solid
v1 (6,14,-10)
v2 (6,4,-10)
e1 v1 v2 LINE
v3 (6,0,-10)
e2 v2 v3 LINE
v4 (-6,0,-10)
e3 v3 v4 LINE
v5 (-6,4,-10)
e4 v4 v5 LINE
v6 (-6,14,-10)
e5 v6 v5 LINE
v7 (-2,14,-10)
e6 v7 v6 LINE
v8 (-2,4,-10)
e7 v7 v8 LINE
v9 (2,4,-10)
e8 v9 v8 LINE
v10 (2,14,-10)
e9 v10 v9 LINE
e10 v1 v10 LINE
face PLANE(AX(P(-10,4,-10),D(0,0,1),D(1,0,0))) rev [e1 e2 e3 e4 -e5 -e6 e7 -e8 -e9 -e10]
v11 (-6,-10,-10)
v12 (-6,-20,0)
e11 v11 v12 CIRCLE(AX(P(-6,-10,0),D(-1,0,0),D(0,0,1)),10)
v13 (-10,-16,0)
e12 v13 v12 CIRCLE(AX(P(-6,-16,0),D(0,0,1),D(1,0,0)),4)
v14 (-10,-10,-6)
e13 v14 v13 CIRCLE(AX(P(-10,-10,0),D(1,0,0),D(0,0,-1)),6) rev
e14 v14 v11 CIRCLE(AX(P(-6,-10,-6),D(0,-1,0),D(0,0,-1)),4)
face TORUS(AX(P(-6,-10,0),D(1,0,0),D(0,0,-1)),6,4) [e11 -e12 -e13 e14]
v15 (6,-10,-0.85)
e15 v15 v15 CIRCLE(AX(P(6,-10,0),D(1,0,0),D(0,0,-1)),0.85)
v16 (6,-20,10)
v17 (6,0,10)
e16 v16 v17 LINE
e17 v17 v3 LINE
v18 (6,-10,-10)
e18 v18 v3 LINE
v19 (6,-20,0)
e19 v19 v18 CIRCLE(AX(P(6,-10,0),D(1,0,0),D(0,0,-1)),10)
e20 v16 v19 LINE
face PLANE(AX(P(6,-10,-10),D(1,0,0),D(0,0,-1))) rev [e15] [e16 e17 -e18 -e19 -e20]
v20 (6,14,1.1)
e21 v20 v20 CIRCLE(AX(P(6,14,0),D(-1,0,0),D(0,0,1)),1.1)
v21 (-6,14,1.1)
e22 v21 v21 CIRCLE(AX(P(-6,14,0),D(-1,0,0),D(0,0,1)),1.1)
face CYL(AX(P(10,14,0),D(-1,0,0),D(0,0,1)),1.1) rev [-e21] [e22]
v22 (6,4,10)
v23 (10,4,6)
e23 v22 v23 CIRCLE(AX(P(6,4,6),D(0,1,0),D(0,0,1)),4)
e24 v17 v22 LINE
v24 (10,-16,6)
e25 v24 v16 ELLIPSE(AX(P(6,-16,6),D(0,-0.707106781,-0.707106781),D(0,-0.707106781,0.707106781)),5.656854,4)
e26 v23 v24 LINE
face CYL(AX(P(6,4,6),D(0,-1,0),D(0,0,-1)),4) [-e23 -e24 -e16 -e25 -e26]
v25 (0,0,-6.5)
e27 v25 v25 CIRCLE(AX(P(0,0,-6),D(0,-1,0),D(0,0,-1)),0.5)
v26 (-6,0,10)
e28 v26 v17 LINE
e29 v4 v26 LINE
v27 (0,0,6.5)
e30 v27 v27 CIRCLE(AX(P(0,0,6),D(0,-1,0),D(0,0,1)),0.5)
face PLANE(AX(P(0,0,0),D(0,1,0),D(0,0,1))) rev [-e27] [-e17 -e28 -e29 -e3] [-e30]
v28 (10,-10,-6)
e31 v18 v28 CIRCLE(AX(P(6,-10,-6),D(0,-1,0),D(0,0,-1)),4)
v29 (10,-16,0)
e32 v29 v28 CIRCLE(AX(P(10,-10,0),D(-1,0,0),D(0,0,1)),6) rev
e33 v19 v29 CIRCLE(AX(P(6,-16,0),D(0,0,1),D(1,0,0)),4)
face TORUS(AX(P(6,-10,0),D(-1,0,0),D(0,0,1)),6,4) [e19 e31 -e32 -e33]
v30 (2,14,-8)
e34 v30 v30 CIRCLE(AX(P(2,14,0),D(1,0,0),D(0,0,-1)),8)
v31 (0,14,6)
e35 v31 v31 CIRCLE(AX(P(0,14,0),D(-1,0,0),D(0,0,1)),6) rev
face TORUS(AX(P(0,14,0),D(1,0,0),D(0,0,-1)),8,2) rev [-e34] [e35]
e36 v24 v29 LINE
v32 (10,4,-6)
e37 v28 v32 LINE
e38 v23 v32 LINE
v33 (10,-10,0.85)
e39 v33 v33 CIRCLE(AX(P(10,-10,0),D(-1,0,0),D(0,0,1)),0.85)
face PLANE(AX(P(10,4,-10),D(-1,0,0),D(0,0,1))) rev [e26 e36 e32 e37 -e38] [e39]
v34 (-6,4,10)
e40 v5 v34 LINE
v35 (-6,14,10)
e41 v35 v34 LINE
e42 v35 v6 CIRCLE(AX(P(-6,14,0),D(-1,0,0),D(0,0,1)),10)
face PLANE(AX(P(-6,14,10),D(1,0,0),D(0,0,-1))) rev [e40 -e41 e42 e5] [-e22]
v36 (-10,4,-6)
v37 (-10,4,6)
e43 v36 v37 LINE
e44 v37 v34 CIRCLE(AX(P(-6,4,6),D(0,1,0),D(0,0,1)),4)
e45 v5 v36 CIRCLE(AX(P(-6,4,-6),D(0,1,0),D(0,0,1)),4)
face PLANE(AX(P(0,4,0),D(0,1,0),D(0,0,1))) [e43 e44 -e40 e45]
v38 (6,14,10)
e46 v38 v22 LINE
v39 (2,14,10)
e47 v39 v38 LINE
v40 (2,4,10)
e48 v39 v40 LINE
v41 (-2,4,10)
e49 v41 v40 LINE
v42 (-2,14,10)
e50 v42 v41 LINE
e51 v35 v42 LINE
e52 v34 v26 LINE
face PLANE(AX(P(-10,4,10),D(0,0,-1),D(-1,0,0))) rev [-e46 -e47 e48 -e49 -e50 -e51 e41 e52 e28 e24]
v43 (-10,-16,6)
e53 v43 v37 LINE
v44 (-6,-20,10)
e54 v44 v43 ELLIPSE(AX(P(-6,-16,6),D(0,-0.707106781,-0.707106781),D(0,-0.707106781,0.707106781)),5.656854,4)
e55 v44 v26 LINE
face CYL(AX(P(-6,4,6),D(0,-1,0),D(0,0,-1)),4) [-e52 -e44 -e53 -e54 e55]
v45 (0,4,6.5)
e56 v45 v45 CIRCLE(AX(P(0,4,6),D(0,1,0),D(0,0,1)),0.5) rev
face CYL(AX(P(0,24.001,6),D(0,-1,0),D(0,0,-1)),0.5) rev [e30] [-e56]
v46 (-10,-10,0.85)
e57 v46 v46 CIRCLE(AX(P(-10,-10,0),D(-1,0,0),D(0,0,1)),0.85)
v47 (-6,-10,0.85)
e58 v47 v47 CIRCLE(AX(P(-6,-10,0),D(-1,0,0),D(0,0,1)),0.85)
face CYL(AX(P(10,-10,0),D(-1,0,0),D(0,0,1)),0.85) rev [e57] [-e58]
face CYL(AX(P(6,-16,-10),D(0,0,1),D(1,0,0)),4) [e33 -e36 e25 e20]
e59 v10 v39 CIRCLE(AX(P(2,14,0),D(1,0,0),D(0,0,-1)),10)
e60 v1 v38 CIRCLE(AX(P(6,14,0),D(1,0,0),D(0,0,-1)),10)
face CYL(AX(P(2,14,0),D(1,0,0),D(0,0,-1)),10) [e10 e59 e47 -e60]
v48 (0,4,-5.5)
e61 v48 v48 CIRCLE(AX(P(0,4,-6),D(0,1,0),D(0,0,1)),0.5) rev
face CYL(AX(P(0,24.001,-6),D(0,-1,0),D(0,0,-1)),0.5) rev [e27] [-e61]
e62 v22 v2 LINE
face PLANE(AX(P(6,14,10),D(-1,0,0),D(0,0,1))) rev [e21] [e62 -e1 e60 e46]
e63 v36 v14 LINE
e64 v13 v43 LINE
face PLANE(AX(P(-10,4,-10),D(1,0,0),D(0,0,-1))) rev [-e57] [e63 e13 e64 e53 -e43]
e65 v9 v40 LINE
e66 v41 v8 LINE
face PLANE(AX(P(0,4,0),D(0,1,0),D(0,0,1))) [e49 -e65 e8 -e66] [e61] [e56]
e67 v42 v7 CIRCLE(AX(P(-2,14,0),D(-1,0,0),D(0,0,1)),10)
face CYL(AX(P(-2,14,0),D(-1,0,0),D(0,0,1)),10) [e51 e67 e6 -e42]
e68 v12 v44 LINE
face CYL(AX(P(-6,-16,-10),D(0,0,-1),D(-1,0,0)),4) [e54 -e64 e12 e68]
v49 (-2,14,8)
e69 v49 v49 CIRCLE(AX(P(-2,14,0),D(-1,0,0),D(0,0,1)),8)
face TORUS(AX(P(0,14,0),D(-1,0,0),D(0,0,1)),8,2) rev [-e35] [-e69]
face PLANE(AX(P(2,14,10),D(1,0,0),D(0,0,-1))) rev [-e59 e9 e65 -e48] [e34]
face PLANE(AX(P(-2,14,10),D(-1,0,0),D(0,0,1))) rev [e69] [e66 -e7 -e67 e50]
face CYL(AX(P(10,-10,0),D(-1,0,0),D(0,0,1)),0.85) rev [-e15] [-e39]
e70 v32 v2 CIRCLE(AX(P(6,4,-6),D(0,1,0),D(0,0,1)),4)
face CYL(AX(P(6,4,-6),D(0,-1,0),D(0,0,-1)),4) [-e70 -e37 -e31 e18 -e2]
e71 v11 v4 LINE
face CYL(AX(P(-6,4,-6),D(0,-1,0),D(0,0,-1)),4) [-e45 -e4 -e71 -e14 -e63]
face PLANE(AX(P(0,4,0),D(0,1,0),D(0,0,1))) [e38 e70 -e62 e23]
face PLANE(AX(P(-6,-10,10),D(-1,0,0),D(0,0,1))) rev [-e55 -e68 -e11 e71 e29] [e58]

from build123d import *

# Parameters (mm, degrees)
SKETCH1_W           = 20
SKETCH1_H           = 20
BOSS_EXTRUDE1_DEPTH = 4
SKETCH4_W           = 4
SKETCH4_H           = 20
BOSS_EXTRUDE2_DEPTH = 10
BOSS_EXTRUDE3_DEPTH = 4
BOSS_EXTRUDE4_START = -4
BOSS_EXTRUDE4_DEPTH = 4
SKETCH7_R           = 0.85
CUT_EXTRUDE1_DEPTH  = 31
FILLET1_R           = 4
SKETCH8_W           = 4
SKETCH8_H           = 20
BOSS_EXTRUDE5_DEPTH = 10
SKETCH9_R           = 10
BOSS_EXTRUDE6_DEPTH = 4
BOSS_EXTRUDE7_START = -4
SKETCH10_R          = 10
BOSS_EXTRUDE7_DEPTH = 4
SKETCH12_R          = 1.1
CUT_EXTRUDE2_DEPTH  = 31.528675045
SKETCH13_R          = 6
BOSS_EXTRUDE8_DEPTH = 4
SKETCH14_R          = 1.1
CUT_EXTRUDE3_DEPTH  = 4
FILLET2_R           = 2
CUT_EXTRUDE4_REACH  = 29.857
SKETCH16_R          = 0.5


with BuildPart() as part:
    # Sketch1 → Boss-Extrude1 (new body)
    with BuildSketch(Plane(origin=(0, 0, 0), x_dir=(1, 0, 0), z_dir=(0, 1, 0))):
        Rectangle(SKETCH1_W, SKETCH1_H)
    extrude(amount=BOSS_EXTRUDE1_DEPTH)

    # Sketch4 → Boss-Extrude2 (add)
    with BuildSketch(Plane.XZ):
        with Locations((-8, 0)):
            Rectangle(SKETCH4_W, SKETCH4_H)
        with Locations((8, 0)):
            Rectangle(SKETCH4_W, SKETCH4_H)
    extrude(amount=BOSS_EXTRUDE2_DEPTH)

    # Sketch5 → Boss-Extrude3 (add)
    with BuildSketch(Plane.ZY.offset(10)):
        with BuildLine():
            Line((0, -20), (10, -20))
            Line((10, -20), (10, -10))
            ThreePointArc((10, -10), (-7.071067812, -2.928932188), (0, -20))
        make_face()
    extrude(amount=-BOSS_EXTRUDE3_DEPTH)

    # Sketch6 → Boss-Extrude4 (add)
    with BuildSketch(Plane(origin=(10, 0, 0), x_dir=(0, 0, -1), z_dir=(1, 0, 0)).offset(BOSS_EXTRUDE4_START)):
        with BuildLine():
            Line((0, -20), (-10, -20))
            Line((-10, -20), (-10, -10))
            ThreePointArc((-10, -10), (7.071067812, -2.928932188), (0, -20))
        make_face()
    extrude(amount=BOSS_EXTRUDE4_DEPTH)

    # Sketch7 → Cut-Extrude1 (cut, through all)
    with BuildSketch(Plane.ZY.offset(10)):
        with Locations((0, -10)):
            Circle(SKETCH7_R)
    extrude(amount=-CUT_EXTRUDE1_DEPTH, mode=Mode.SUBTRACT)

    # Fillet1
    fillet1_edges = [part.edges().sort_by_distance(p)[0] for p in [
        (-10, -8, 10),
        (-10, -17.071067812, -7.071067812),
        (10, -8, 10),
        (10, -17.071067812, -7.071067812),
        (-10, -3, -10),
        (10, -3, -10),
        (10, -20, 5),
        (-10, -20, 5),
    ]]
    fillet(fillet1_edges, radius=FILLET1_R - 0.0001)  # a hair under: the kernel refuses the full size

    # Sketch8 → Boss-Extrude5 (add)
    with BuildSketch(Plane(origin=(0, 4, 0), x_dir=(1, 0, 0), z_dir=(0, 1, 0))):
        with Locations((4, 0)):
            Rectangle(SKETCH8_W, SKETCH8_H)
        with Locations((-4, 0)):
            Rectangle(SKETCH8_W, SKETCH8_H)
    extrude(amount=BOSS_EXTRUDE5_DEPTH)

    # Sketch9 → Boss-Extrude6 (add)
    with BuildSketch(Plane(origin=(6, 0, 0), x_dir=(0, 0, -1), z_dir=(1, 0, 0))):
        with Locations((0, 14)):
            Circle(SKETCH9_R)
    extrude(amount=-BOSS_EXTRUDE6_DEPTH)

    # Sketch10 → Boss-Extrude7 (add)
    with BuildSketch(Plane.ZY.offset(6).offset(BOSS_EXTRUDE7_START)):
        with Locations((0, 14)):
            Circle(SKETCH10_R)
    extrude(amount=BOSS_EXTRUDE7_DEPTH)

    # Sketch12 → Cut-Extrude2 (cut, through all)
    with BuildSketch(Plane.ZY.offset(6)):
        with Locations((0, 14)):
            Circle(SKETCH12_R)
    extrude(amount=-CUT_EXTRUDE2_DEPTH, mode=Mode.SUBTRACT)

    # Sketch13 → Boss-Extrude8 (add)
    with BuildSketch(Plane(origin=(-2, 0, 0), x_dir=(0, 0, -1), z_dir=(1, 0, 0))):
        with Locations(Location((0, 14, 0), (0, 0, 180))):
            Circle(SKETCH13_R)
    extrude(amount=BOSS_EXTRUDE8_DEPTH)

    # Sketch14 → Cut-Extrude3 (cut)
    with BuildSketch(Plane(origin=(-2, 0, 0), x_dir=(0, 0, -1), z_dir=(1, 0, 0))):
        with Locations(Location((0, 14, 0), (0, 0, 180))):
            Circle(SKETCH14_R)
    extrude(amount=CUT_EXTRUDE3_DEPTH, mode=Mode.SUBTRACT)

    # Fillet2
    fillet2_edges = [part.edges().sort_by_distance(p)[0] for p in [
        (-2, 14, -6),
        (2, 14, -6),
    ]]
    fillet(fillet2_edges, radius=FILLET2_R - 0.0001)  # a hair under: the kernel refuses the full size

    # Sketch16 → Cut-Extrude4 (cut, up to next)
    with BuildSketch(Plane.XZ, mode=Mode.PRIVATE) as cut_extrude4_sk1:
        with Locations(Location((0, -6, 0), (0, 0, 270))):
            Circle(SKETCH16_R)
    cut_extrude4_tool1 = extrude(cut_extrude4_sk1.sketch, amount=-CUT_EXTRUDE4_REACH, mode=Mode.PRIVATE) & part.part
    # Sketch16 → Cut-Extrude4 (cut, up to next)
    with BuildSketch(Plane.XZ, mode=Mode.PRIVATE) as cut_extrude4_sk2:
        with Locations(Location((0, 6, 0), (0, 0, 90))):
            Circle(SKETCH16_R)
    cut_extrude4_tool2 = extrude(cut_extrude4_sk2.sketch, amount=-CUT_EXTRUDE4_REACH, mode=Mode.PRIVATE) & part.part
    add(cut_extrude4_tool1.solids().sort_by_distance((0, 0, -6))[0], mode=Mode.SUBTRACT)
    add(cut_extrude4_tool2.solids().sort_by_distance((0, 0, 6))[0], mode=Mode.SUBTRACT)


solid = part.part
